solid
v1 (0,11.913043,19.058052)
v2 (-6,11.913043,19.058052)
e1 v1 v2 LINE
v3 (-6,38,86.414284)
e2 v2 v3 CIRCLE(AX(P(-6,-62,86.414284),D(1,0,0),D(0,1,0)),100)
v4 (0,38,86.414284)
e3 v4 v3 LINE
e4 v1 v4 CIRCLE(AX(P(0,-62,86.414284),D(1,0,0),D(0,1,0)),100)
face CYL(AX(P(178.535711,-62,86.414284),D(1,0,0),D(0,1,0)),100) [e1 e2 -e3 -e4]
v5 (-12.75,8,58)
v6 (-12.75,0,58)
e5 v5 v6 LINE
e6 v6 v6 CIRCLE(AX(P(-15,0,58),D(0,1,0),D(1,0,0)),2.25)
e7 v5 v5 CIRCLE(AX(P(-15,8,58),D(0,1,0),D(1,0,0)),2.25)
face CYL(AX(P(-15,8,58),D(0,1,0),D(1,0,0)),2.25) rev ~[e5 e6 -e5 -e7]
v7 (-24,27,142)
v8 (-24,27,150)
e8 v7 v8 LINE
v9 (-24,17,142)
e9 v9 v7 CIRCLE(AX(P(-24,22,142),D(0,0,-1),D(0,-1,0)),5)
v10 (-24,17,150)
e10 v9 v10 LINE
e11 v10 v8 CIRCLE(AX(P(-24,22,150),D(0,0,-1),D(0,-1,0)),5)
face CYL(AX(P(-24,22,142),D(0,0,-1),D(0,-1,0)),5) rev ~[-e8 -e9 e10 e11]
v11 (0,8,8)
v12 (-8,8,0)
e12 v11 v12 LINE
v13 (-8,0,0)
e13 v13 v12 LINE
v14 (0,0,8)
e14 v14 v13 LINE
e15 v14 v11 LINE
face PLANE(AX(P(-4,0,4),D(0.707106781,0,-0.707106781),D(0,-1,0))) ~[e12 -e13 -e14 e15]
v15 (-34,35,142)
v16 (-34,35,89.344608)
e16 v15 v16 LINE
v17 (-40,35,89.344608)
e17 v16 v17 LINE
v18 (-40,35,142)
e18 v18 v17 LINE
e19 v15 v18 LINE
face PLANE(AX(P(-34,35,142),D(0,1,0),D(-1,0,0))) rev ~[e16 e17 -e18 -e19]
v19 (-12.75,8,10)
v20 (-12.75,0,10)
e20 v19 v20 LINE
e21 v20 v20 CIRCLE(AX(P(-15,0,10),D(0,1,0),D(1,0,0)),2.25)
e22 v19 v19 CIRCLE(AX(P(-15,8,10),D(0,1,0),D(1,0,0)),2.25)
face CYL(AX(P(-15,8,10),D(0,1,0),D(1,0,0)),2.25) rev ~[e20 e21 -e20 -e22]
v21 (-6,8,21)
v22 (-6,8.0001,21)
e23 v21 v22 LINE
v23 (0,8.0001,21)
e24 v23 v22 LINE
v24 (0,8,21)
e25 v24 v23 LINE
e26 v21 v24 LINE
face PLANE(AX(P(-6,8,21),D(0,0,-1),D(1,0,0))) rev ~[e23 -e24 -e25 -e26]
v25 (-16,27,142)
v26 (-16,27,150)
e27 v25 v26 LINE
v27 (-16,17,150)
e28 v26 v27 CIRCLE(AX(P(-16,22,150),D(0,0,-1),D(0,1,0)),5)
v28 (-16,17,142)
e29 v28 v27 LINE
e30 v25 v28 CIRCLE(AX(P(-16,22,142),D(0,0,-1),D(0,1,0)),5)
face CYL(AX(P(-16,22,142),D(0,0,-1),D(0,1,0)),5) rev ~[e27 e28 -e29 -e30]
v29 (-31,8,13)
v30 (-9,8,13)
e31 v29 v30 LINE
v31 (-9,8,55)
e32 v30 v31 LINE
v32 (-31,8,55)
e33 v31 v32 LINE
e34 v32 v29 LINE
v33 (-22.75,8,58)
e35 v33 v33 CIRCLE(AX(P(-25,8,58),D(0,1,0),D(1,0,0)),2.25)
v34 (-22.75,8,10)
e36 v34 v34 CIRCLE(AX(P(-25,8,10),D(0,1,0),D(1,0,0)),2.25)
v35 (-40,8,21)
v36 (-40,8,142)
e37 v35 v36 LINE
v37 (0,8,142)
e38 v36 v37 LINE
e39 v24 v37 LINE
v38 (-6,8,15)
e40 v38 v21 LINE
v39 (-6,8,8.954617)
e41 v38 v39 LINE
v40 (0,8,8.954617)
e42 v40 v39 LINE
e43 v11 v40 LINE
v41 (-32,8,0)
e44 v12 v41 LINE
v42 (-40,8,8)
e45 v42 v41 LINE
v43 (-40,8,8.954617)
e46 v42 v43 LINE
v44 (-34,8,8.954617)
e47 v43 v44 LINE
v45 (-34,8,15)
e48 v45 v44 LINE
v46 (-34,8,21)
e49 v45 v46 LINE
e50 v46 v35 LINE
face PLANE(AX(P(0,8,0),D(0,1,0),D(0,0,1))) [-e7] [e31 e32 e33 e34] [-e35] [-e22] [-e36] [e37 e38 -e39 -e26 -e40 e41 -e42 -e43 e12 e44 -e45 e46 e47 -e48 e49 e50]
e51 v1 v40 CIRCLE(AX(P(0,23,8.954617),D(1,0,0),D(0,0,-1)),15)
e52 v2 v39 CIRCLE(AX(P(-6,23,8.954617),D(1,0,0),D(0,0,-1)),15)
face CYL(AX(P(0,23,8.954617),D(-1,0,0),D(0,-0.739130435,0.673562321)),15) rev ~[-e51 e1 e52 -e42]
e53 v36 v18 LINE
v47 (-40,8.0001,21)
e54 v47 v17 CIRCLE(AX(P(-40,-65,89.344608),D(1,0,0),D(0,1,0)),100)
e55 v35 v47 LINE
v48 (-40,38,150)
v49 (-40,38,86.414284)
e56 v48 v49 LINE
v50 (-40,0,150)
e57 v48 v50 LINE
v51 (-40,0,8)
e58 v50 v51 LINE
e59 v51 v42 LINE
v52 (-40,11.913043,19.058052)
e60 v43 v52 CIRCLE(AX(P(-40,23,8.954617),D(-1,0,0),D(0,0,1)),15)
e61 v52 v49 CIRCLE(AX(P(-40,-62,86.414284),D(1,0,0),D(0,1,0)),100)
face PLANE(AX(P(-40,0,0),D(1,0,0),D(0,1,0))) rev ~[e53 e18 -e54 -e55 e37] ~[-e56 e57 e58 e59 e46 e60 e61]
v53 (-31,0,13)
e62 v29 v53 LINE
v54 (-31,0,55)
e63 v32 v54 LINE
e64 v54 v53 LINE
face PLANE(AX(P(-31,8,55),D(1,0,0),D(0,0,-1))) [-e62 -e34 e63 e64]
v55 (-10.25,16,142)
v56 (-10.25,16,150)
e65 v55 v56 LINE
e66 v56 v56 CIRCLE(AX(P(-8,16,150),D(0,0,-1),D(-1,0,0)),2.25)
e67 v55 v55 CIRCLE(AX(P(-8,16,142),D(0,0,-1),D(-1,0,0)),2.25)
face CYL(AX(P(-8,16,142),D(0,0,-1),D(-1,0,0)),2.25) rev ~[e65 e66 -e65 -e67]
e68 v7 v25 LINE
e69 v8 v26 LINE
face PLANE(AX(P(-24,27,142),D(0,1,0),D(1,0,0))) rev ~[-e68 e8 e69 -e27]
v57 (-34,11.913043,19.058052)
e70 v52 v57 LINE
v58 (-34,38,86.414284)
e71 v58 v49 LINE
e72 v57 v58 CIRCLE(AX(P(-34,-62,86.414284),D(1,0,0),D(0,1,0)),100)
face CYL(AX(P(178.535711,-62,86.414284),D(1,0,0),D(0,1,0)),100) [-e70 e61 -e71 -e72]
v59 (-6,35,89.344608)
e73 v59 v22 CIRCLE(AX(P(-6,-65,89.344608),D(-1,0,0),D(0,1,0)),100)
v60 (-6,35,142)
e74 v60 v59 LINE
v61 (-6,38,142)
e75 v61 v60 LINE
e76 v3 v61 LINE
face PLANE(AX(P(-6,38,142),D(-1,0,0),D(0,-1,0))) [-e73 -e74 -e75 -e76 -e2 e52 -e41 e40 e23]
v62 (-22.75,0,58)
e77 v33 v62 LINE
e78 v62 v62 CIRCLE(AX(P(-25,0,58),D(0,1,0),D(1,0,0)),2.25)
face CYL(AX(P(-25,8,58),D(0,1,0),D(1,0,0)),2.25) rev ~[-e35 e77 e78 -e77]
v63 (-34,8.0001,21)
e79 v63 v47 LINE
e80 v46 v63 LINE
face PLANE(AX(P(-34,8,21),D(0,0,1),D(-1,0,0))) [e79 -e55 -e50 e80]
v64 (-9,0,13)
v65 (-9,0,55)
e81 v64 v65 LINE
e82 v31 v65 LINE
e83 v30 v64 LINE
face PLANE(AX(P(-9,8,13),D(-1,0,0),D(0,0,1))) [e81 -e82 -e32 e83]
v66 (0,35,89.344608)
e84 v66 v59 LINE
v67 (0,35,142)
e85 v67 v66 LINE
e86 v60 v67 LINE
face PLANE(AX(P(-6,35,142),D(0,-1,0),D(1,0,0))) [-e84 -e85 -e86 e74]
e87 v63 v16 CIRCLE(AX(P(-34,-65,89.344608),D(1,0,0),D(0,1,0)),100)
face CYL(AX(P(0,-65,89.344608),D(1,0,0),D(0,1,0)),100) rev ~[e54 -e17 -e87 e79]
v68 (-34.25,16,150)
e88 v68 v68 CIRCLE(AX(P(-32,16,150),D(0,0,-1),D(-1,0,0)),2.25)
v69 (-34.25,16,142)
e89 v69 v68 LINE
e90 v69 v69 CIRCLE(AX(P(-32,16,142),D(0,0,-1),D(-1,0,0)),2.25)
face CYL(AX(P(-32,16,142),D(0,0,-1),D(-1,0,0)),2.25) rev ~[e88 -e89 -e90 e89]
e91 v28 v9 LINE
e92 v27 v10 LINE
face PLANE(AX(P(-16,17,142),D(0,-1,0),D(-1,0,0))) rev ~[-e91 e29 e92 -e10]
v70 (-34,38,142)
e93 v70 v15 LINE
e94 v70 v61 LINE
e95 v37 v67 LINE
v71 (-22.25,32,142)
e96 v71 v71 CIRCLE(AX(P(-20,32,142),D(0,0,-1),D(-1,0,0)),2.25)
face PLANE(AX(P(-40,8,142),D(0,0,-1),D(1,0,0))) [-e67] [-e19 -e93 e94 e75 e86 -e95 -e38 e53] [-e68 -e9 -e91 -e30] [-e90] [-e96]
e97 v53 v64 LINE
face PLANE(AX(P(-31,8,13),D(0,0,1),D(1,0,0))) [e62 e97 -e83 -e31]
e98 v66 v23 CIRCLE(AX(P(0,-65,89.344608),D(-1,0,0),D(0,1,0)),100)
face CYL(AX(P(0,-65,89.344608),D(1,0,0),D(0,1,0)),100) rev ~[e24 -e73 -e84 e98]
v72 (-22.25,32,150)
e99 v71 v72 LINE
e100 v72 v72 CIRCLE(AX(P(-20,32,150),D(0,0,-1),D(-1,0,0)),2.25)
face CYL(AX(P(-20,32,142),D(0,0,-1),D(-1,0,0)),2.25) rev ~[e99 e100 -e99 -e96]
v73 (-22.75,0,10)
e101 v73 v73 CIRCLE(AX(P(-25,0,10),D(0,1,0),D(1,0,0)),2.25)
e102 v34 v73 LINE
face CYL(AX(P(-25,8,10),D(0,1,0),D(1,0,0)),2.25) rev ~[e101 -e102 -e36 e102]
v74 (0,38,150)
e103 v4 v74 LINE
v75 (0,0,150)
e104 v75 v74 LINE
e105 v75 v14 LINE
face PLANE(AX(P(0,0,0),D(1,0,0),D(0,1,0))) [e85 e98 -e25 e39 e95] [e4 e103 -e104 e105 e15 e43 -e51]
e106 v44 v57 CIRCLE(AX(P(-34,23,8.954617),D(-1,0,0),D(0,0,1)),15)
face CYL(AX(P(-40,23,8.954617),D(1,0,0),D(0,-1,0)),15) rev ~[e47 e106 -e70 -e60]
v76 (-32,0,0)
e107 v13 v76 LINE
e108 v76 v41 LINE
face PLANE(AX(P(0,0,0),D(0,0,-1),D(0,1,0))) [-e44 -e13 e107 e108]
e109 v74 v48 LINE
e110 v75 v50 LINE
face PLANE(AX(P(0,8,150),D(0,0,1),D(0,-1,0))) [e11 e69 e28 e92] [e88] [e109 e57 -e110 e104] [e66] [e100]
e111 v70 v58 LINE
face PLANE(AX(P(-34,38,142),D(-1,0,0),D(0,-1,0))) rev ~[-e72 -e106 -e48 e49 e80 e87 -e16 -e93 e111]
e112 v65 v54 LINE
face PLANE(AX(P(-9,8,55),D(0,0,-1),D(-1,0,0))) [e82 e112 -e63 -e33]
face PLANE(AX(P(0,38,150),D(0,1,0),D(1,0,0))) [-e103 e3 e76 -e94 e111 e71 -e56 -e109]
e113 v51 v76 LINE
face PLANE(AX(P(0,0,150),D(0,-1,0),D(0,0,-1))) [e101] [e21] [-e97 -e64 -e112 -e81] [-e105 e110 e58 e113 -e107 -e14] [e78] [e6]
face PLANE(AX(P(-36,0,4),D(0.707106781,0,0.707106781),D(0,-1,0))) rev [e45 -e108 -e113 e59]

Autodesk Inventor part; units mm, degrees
ref_plane "YZ Plane" through (0, 0, 0) normal (1, 0, 0) x (0, 1, 0)
ref_plane "XZ Plane" through (0, 0, 0) normal (0, 1, 0) x (-1, 0, 0)
ref_plane "XY Plane" through (0, 0, 0) normal (0, 0, 1) x (1, 0, 0)
sketch "Sketch1" plane through (0, 0, 0) normal (1, 0, 0) x (0, 1, 0)
  line L0 (0, 0) -> (8, 0)
  line L1 (8, 0) -> (8, 150)
  line L2 (8, 150) -> (0, 150)
  line L3 (0, 150) -> (0, 0)
  dimension "d0" = 150
  dimension "d1" = 8
extrude "BODY1" add sketch "Sketch1" against normal blind 40
sketch "Sketch2" plane through (0, 8, 150) normal (0, 1, 0) x (1, 0, 0)
  line L0 (0, 0) -> (-40, 0)
  line L1 (-40, 0) -> (-40, 8)
  line L2 (-40, 8) -> (0, 8)
  line L3 (0, 8) -> (0, 0)
  dimension "d4" = 40
  dimension "d5" = 8
extrude "BODY2" add sketch "Sketch2" along normal blind 30
sketch "Sketch3" plane through (-40, 8, 0) normal (0, 1, 0) x (1, 0, 0)
  line L0 (40, 0) -> (0, 0) construction
  line L1 (0, -142) -> (0, 0) construction
  circle A0 centre (15, -10) radius 2.25
  circle A1 centre (25, -10) radius 2.25
  circle A2 centre (15, -58) radius 2.25
  circle A3 centre (25, -58) radius 2.25
  line L2 (9, -13) -> (31, -13)
  line L3 (31, -13) -> (31, -55)
  line L4 (31, -55) -> (9, -55)
  line L5 (9, -55) -> (9, -13)
  dimension "d8" = 48
  dimension "d9" = 48
  dimension "d10" = 10
  dimension "d11" = 10
  dimension "d12" = 4.5
  dimension "d13" = 4.5
  dimension "d14" = 4.5
  dimension "d15" = 4.5
  dimension "d16" = 15
  dimension "d17" = 10
  dimension "d18" = 15
  dimension "d19" = 10
  dimension "d20" = 22
  dimension "d21" = 42
  dimension "d22" = 9
  dimension "d23" = 3
extrude "SERVO" cut sketch "Sketch3" against normal blind 8
sketch "Sketch4" plane through (0, 8, 142) normal (0, 0, -1) x (-1, 0, 0)
  line L0 (40, 0) -> (0, 0) construction
  line L1 (40, 0) -> (40, 30) construction
  line L2 (0, 30) -> (40, 30) construction
  line L3 (0, 0) -> (0, 30) construction
  line L4 (24, 19) -> (16, 19)
  line L5 (16, 19) -> (16, 9)
  line L6 (16, 9) -> (24, 9)
  line L7 (24, 9) -> (24, 19)
  arc A0 (24, 9) -> (24, 19) centre (24, 14) ccw
  arc A1 (16, 19) -> (16, 9) centre (16, 14) ccw
  circle A2 centre (20, 24) radius 2.25
  circle A3 centre (32, 8) radius 2.25
  circle A4 centre (8, 8) radius 2.25
  point P0 (0, -8)
  dimension "d26" = 11
  dimension "d28" = 8
  dimension "d29" = 10
  dimension "d30" = 16
  dimension "d32" = 4.5
  dimension "d33" = 4.5
  dimension "d34" = 4.5
  dimension "d35" = 20
  dimension "d36" = 8
  dimension "d37" = 8
  dimension "d39" = 6
  dimension "d40" = 8
  dimension "d41" = 8
extrude "CONNECTION" cut sketch "Sketch4" against normal blind 8
chamfer "v3_servo_chamfer" distance 8 angle 45 2 edges at (0, 4, 0) (-40, 4, 0)
sketch "v3_ribs_sketch" plane through (0, 8, 142) normal (0, 0, -1) x (-1, 0, 0)
  line L0 (0, 30) -> (0, -8) construction
  line L1 (0, 30) -> (6, 30)
  line L2 (6, 30) -> (6, 27)
  line L3 (6, 27) -> (0, 27)
  line L4 (0, 27) -> (0, 30)
  line L5 (40, 30) -> (0, 30) construction
  line L6 (40, 30) -> (34, 30)
  line L7 (34, 30) -> (34, 27)
  line L8 (34, 27) -> (40, 27)
  line L9 (40, 27) -> (40, 30)
  dimension "d66" = 6
  dimension "d67" = 3
  dimension "d68" = 6
  dimension "d69" = 3
sketch "Sketch8" plane through (-40, 8, 142) normal (0, 1, 0) x (1, 0, 0)
  line L0 (0, 0) -> (0, 134) construction
  line L1 (40, 134) -> (40, 0) construction
  line L2 (32, 142) -> (8, 142) construction
  line L3 (40, 127) -> (34, 127)
  line L4 (34, 127) -> (34, 121)
  line L5 (34, 121) -> (40, 121)
  line L6 (40, 121) -> (40, 127)
  line L7 (0, 127) -> (6, 127)
  line L8 (6, 127) -> (6, 121)
  line L9 (6, 121) -> (0, 121)
  line L10 (0, 121) -> (0, 127)
  point P0 (40, 142)
  dimension "d70" = 6
  dimension "d71" = 6
  dimension "d72" = 6
  dimension "d73" = 6
  dimension "d74" = 15
  dimension "d75" = 15
extrude "v3_ribs_extrusion1" add sketch "Sketch8" along normal blind 30
extrude "v3_ribs_extrusion2" add sketch "v3_ribs_sketch" along normal blind 122
chamfer "v3_ribs_chamfer1" distance 27 angle 45 2 edges at (-3, 35, 21) (-37, 35, 21)
fillet "v3_ribs_fillet1" radius 100 2 edges at (-3, 35, 47.9999) (-37, 35, 47.9999)
fillet "v3_ribs_fillet2" radius 100 2 edges at (-3, 38, 15) (-37, 38, 15)
fillet "v3_ribs_fillet3" radius 15 2 edges at (-3, 8, 15) (-37, 8, 15)
equation "\"d4\" = d2"
equation "\"d5\" = d1"
equation "\"d9\" = d8"
equation "\"d11\" = d10"
equation "\"d13\" = d12"
equation "\"d14\" = d12"
equation "\"d15\" = d12"
equation "\"d18\" = d16"
equation "\"d19\" = d17"
equation "\"d32\" = d12"
equation "\"d33\" = d12"
equation "\"d34\" = d12"
equation "\"d37\" = d36"
equation "\"d41\" = d40"
equation "\"d68\" = d66"
equation "\"d69\" = d67"
equation "\"d70\" = d72"
equation "\"d71\" = d72"
equation "\"d72\" = d66"
equation "\"d73\" = d66"
equation "\"d75\" = d74"
equation "\"d2\" = 40"
properties part number "BONE_v3" material "PLA plastic"
